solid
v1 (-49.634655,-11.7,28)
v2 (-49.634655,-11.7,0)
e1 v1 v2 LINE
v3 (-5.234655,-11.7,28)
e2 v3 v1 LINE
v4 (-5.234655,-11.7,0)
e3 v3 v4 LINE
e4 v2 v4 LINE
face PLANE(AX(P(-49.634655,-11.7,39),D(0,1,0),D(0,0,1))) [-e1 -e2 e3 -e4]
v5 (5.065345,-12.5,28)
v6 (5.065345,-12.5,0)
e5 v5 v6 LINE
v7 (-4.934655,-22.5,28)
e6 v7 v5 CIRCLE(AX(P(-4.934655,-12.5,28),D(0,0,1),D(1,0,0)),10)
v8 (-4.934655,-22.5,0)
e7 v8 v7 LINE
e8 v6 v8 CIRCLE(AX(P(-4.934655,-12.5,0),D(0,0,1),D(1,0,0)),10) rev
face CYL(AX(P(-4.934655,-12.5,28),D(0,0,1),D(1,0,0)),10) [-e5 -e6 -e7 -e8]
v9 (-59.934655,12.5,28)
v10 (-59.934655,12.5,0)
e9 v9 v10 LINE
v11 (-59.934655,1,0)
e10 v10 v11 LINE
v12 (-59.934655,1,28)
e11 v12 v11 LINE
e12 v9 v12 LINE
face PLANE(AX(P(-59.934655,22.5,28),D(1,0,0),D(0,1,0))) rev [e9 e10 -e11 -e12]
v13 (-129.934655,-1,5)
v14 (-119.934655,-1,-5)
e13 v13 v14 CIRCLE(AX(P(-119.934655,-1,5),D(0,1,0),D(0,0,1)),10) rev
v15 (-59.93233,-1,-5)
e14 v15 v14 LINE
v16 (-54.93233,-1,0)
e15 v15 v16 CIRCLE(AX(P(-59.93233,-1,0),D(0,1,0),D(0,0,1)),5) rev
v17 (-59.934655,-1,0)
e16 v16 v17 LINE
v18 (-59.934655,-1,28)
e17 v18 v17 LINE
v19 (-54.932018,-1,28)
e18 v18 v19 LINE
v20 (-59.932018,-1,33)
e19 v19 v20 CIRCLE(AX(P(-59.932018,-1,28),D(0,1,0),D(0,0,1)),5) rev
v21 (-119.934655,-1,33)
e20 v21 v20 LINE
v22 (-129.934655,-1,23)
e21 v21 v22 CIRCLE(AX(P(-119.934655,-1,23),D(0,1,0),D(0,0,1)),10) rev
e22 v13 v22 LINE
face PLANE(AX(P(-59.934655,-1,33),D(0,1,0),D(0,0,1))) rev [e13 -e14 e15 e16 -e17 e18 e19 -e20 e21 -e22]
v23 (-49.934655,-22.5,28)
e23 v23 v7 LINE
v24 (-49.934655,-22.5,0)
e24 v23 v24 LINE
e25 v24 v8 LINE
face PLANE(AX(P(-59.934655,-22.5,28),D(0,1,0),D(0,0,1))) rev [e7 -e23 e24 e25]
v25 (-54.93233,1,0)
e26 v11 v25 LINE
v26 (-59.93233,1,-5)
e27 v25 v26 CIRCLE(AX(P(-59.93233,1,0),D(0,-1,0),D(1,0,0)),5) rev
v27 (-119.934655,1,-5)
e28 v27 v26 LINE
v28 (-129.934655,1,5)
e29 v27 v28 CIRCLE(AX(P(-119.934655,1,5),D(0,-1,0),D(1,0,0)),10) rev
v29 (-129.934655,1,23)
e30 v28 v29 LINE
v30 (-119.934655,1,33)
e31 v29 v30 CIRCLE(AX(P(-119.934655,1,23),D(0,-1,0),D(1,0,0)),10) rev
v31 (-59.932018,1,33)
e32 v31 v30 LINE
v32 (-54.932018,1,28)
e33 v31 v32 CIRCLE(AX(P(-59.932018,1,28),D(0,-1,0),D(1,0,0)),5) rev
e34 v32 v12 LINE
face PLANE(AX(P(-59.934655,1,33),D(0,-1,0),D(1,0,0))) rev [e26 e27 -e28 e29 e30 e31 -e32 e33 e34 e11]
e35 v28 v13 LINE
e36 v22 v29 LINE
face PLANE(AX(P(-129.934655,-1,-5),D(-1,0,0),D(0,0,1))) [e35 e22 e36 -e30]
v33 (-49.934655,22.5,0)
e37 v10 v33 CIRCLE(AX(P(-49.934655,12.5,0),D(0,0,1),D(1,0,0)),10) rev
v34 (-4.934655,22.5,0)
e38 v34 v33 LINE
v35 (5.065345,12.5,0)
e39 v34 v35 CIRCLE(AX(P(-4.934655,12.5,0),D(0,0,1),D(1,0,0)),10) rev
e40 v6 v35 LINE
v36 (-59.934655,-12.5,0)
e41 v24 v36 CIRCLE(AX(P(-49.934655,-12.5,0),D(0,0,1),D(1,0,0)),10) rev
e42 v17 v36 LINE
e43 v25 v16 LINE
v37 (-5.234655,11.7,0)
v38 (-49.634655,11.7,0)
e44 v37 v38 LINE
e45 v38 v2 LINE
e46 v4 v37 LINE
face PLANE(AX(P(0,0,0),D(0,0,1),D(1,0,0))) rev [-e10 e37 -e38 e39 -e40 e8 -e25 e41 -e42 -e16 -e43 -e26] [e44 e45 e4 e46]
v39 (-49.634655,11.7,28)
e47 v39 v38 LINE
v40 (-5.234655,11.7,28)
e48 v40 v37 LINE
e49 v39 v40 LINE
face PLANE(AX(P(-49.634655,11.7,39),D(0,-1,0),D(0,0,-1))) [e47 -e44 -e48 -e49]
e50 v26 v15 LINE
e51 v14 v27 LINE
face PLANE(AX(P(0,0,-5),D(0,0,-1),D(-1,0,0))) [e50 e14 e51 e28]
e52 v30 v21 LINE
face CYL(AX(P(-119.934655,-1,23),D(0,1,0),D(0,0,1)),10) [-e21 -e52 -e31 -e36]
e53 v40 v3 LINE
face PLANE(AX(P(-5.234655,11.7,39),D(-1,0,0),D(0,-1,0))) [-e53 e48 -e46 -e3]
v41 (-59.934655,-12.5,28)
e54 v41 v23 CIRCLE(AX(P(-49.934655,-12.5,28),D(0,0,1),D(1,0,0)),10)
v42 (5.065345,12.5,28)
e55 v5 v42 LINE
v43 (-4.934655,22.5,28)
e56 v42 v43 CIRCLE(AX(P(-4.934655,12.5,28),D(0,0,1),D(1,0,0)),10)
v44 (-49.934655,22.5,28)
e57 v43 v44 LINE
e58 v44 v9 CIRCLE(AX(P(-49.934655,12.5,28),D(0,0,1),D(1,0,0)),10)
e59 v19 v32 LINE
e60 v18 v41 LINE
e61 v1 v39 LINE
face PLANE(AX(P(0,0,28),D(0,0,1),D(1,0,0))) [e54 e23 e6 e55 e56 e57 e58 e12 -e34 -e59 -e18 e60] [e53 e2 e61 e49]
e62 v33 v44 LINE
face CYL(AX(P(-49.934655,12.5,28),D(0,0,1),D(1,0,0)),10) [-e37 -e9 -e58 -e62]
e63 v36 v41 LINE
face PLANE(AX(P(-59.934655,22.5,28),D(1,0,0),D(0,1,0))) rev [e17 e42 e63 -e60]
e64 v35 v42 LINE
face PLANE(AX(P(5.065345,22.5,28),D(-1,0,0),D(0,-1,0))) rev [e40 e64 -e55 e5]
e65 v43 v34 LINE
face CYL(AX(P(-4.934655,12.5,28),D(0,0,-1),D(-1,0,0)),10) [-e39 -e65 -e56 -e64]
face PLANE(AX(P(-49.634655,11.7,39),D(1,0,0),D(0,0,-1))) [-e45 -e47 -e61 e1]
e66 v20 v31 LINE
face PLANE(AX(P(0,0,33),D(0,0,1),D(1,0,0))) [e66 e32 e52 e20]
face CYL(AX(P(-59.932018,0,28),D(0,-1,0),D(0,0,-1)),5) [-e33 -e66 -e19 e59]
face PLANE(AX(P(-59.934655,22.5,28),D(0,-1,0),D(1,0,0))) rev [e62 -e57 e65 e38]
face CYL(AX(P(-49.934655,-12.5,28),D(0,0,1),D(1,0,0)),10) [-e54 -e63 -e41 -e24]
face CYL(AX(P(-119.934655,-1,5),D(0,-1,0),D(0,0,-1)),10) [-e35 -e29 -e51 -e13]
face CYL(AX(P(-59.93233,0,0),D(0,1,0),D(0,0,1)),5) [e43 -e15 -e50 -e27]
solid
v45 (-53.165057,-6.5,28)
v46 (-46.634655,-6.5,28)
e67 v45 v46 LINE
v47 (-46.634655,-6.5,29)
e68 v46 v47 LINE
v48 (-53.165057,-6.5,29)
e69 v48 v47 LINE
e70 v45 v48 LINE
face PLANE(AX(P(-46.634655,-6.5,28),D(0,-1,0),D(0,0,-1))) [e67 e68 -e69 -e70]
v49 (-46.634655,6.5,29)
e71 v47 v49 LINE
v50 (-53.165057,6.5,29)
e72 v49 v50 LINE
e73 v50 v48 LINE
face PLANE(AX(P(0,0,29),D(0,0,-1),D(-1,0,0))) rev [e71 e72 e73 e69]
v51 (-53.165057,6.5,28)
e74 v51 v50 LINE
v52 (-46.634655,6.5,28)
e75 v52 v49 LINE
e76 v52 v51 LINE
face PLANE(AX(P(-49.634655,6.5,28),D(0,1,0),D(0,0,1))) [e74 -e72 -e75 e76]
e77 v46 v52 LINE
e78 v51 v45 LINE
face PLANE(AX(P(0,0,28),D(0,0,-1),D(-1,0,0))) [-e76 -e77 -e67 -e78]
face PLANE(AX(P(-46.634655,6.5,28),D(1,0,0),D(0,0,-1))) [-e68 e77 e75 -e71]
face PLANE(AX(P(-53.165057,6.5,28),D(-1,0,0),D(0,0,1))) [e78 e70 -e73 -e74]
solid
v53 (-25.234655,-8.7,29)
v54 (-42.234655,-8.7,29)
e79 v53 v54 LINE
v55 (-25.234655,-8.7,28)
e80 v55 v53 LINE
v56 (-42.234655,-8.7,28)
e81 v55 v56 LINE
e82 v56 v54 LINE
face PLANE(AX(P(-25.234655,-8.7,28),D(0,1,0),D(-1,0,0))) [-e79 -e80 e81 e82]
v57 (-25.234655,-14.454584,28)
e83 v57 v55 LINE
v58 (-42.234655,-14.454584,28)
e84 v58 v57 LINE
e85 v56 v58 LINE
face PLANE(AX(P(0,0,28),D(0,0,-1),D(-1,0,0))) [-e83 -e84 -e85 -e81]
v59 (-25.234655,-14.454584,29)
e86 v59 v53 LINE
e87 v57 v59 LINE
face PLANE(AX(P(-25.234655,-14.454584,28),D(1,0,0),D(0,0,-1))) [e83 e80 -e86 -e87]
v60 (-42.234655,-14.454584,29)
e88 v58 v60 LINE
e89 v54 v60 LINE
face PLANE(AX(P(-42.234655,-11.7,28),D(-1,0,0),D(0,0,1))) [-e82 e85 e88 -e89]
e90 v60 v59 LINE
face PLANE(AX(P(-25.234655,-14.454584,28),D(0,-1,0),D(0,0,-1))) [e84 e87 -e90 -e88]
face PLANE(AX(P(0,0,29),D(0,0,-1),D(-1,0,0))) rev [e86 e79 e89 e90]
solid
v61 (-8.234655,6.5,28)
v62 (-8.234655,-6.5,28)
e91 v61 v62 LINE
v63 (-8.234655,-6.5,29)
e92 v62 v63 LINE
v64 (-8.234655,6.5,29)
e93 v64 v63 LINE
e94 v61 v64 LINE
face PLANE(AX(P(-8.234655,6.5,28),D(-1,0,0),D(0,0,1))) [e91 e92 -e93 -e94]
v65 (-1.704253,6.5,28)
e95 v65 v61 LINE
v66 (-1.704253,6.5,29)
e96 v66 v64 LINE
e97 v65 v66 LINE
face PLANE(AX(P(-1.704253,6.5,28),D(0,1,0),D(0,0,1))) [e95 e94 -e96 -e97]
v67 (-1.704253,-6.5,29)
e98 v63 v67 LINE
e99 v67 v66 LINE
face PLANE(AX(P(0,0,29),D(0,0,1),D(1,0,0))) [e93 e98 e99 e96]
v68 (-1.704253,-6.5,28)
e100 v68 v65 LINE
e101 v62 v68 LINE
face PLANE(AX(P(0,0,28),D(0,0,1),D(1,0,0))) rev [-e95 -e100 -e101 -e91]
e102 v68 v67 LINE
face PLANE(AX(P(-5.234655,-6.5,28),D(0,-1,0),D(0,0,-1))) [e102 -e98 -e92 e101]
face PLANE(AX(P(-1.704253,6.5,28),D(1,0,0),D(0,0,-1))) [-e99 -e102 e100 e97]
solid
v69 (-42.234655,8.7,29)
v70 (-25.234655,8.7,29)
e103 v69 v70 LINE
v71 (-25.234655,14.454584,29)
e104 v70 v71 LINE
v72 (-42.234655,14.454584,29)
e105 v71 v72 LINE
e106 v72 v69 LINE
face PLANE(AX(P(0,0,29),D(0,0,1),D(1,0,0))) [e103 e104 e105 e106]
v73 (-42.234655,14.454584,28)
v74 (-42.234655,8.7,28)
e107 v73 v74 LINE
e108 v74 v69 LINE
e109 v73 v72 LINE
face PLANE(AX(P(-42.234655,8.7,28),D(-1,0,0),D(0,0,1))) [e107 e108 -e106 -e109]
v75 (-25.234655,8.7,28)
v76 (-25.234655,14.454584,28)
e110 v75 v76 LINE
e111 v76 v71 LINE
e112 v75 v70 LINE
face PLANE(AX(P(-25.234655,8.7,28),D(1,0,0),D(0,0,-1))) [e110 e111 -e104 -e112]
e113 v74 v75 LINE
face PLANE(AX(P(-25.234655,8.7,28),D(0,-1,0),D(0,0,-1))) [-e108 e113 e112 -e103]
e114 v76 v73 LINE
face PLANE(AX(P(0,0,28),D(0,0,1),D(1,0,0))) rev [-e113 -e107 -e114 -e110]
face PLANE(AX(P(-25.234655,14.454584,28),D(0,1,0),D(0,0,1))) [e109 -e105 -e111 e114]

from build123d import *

# Parameters (mm, degrees)
SKETCH_1_W           = 65
SKETCH_1_H           = 45
EXTRUDE_1_DEPTH      = 28
SKETCH_2_W           = 44.4
SKETCH_2_H           = 23.4
CUT_EXTRUDE_1_DEPTH  = 39
FILLET_1_R           = 10
FILLET_2_R           = 10
FILLET_3_R           = 10
FILLET_4_R           = 10
EXTRUDE_6_DEPTH      = 1
EXTRUDE_6_2_DEPTH    = 1
EXTRUDE_6_3_DEPTH    = 1
SKETCH_10_W          = 17
SKETCH_10_H          = 5.754584259
EXTRUDE_6_4_DEPTH    = 1
SKETCH_20_W          = 5.002637397
SKETCH_20_H          = 2
EXTRUDE_7_DEPTH      = 5
SKETCH_21_W          = 5.00232547
SKETCH_21_H          = 2
EXTRUDE_8_DEPTH      = 5
EXTRUDE_9_DEPTH      = 1
EXTRUDE_9_DEPTH_BACK = 1
SKETCH_22_W          = 70
SKETCH_22_H          = 38
FILLET_5_R           = 5
FILLET_6_R           = 5
FILLET_7_R           = 10
FILLET_8_R           = 10


with BuildPart() as part:
    # 草圖1 → 填料-伸長1 (new body)
    with BuildSketch(Plane.XY):
        with Locations((-27.434655272, 0)):
            Rectangle(SKETCH_1_W, SKETCH_1_H)
    extrude(amount=EXTRUDE_1_DEPTH)

    # 草圖2 → 除料-伸長1 (cut)
    with BuildSketch(Plane.XY):
        with Locations((-27.434655272, 0)):
            Rectangle(SKETCH_2_W, SKETCH_2_H)
    extrude(amount=CUT_EXTRUDE_1_DEPTH, mode=Mode.SUBTRACT)

    # 圓角1
    fillet_1_edges = [part.edges().sort_by_distance(p)[0] for p in [
        (-59.934655272, -22.5, 14),
    ]]
    fillet(fillet_1_edges, radius=FILLET_1_R)

    # 圓角2
    fillet_2_edges = [part.edges().sort_by_distance(p)[0] for p in [
        (-59.934655272, 22.5, 14),
    ]]
    fillet(fillet_2_edges, radius=FILLET_2_R)

    # 圓角3
    fillet_3_edges = [part.edges().sort_by_distance(p)[0] for p in [
        (5.065344728, 22.5, 14),
    ]]
    fillet(fillet_3_edges, radius=FILLET_3_R)

    # 圓角4
    fillet_4_edges = [part.edges().sort_by_distance(p)[0] for p in [
        (5.065344728, -22.5, 14),
    ]]
    fillet(fillet_4_edges, radius=FILLET_4_R)

    # 草圖20 → 填料-伸長7 (add)
    with BuildSketch(Plane.XY.offset(28)):
        with Locations((-57.433336574, 0)):
            Rectangle(SKETCH_20_W, SKETCH_20_H)
    extrude(amount=EXTRUDE_7_DEPTH)

    # 草圖21 → 填料-伸長8 (add)
    with BuildSketch(Plane(origin=(0, 0, 0), x_dir=(-1, 0, 0), z_dir=(0, 0, -1))):
        with Locations((57.433492537, 0)):
            Rectangle(SKETCH_21_W, SKETCH_21_H)
    extrude(amount=EXTRUDE_8_DEPTH)

    # 草圖22 → 填料-伸長9 (add, two sides: drawn at the far end of the back side and taken through both)
    with BuildSketch(Plane(origin=(0, 0, 0), x_dir=(1, 0, 0), z_dir=(0, 1, 0)).offset(-EXTRUDE_9_DEPTH_BACK)):
        with Locations((-94.934655272, -14)):
            Rectangle(SKETCH_22_W, SKETCH_22_H)
    extrude(amount=EXTRUDE_9_DEPTH + EXTRUDE_9_DEPTH_BACK)

    # 圓角5
    fillet_5_edges = [part.edges().sort_by_distance(p)[0] for p in [
        (-54.932329802, 0, -5),
    ]]
    fillet(fillet_5_edges, radius=FILLET_5_R - 0.0001)  # a hair under: the kernel refuses the full size

    # 圓角6
    fillet_6_edges = [part.edges().sort_by_distance(p)[0] for p in [
        (-54.932017875, 0, 33),
    ]]
    fillet(fillet_6_edges, radius=FILLET_6_R - 0.0001)  # a hair under: the kernel refuses the full size

    # 圓角7
    fillet_7_edges = [part.edges().sort_by_distance(p)[0] for p in [
        (-129.934655272, 0, -5),
    ]]
    fillet(fillet_7_edges, radius=FILLET_7_R)

    # 圓角8
    fillet_8_edges = [part.edges().sort_by_distance(p)[0] for p in [
        (-129.934655272, 0, 33),
    ]]
    fillet(fillet_8_edges, radius=FILLET_8_R)


with BuildPart() as body_2:
    # 草圖10 → 填料-伸長6 (new body)
    with BuildSketch(Plane.XY.offset(29)):
        Polygon((-49.634655272, 6.5), (-53.165057103, 6.5), (-53.165057103, -6.5), (-46.634655272, -6.5), (-46.634655272, 6.5), align=None)
    extrude(amount=-EXTRUDE_6_DEPTH)


with BuildPart() as body_3:
    # 草圖10 → Extrude 6 2 (new body)
    with BuildSketch(Plane.XY.offset(29)):
        Polygon((-42.234655272, -11.7), (-42.234655272, -8.7), (-25.234655272, -8.7), (-25.234655272, -14.454584259), (-42.234655272, -14.454584259), align=None)
    extrude(amount=-EXTRUDE_6_2_DEPTH)


with BuildPart() as body_4:
    # 草圖10 → Extrude 6 3 (new body)
    with BuildSketch(Plane.XY.offset(29)):
        Polygon((-8.234655272, 6.5), (-8.234655272, -6.5), (-5.234655272, -6.5), (-1.70425344, -6.5), (-1.70425344, 6.5), align=None)
    extrude(amount=-EXTRUDE_6_3_DEPTH)


with BuildPart() as body_5:
    # 草圖10 → Extrude 6 4 (new body)
    with BuildSketch(Plane.XY.offset(29)):
        with Locations((-33.734655272, 11.57729213)):
            Rectangle(SKETCH_10_W, SKETCH_10_H)
    extrude(amount=-EXTRUDE_6_4_DEPTH)


solid = Compound([part.part, body_2.part, body_3.part, body_4.part, body_5.part])
